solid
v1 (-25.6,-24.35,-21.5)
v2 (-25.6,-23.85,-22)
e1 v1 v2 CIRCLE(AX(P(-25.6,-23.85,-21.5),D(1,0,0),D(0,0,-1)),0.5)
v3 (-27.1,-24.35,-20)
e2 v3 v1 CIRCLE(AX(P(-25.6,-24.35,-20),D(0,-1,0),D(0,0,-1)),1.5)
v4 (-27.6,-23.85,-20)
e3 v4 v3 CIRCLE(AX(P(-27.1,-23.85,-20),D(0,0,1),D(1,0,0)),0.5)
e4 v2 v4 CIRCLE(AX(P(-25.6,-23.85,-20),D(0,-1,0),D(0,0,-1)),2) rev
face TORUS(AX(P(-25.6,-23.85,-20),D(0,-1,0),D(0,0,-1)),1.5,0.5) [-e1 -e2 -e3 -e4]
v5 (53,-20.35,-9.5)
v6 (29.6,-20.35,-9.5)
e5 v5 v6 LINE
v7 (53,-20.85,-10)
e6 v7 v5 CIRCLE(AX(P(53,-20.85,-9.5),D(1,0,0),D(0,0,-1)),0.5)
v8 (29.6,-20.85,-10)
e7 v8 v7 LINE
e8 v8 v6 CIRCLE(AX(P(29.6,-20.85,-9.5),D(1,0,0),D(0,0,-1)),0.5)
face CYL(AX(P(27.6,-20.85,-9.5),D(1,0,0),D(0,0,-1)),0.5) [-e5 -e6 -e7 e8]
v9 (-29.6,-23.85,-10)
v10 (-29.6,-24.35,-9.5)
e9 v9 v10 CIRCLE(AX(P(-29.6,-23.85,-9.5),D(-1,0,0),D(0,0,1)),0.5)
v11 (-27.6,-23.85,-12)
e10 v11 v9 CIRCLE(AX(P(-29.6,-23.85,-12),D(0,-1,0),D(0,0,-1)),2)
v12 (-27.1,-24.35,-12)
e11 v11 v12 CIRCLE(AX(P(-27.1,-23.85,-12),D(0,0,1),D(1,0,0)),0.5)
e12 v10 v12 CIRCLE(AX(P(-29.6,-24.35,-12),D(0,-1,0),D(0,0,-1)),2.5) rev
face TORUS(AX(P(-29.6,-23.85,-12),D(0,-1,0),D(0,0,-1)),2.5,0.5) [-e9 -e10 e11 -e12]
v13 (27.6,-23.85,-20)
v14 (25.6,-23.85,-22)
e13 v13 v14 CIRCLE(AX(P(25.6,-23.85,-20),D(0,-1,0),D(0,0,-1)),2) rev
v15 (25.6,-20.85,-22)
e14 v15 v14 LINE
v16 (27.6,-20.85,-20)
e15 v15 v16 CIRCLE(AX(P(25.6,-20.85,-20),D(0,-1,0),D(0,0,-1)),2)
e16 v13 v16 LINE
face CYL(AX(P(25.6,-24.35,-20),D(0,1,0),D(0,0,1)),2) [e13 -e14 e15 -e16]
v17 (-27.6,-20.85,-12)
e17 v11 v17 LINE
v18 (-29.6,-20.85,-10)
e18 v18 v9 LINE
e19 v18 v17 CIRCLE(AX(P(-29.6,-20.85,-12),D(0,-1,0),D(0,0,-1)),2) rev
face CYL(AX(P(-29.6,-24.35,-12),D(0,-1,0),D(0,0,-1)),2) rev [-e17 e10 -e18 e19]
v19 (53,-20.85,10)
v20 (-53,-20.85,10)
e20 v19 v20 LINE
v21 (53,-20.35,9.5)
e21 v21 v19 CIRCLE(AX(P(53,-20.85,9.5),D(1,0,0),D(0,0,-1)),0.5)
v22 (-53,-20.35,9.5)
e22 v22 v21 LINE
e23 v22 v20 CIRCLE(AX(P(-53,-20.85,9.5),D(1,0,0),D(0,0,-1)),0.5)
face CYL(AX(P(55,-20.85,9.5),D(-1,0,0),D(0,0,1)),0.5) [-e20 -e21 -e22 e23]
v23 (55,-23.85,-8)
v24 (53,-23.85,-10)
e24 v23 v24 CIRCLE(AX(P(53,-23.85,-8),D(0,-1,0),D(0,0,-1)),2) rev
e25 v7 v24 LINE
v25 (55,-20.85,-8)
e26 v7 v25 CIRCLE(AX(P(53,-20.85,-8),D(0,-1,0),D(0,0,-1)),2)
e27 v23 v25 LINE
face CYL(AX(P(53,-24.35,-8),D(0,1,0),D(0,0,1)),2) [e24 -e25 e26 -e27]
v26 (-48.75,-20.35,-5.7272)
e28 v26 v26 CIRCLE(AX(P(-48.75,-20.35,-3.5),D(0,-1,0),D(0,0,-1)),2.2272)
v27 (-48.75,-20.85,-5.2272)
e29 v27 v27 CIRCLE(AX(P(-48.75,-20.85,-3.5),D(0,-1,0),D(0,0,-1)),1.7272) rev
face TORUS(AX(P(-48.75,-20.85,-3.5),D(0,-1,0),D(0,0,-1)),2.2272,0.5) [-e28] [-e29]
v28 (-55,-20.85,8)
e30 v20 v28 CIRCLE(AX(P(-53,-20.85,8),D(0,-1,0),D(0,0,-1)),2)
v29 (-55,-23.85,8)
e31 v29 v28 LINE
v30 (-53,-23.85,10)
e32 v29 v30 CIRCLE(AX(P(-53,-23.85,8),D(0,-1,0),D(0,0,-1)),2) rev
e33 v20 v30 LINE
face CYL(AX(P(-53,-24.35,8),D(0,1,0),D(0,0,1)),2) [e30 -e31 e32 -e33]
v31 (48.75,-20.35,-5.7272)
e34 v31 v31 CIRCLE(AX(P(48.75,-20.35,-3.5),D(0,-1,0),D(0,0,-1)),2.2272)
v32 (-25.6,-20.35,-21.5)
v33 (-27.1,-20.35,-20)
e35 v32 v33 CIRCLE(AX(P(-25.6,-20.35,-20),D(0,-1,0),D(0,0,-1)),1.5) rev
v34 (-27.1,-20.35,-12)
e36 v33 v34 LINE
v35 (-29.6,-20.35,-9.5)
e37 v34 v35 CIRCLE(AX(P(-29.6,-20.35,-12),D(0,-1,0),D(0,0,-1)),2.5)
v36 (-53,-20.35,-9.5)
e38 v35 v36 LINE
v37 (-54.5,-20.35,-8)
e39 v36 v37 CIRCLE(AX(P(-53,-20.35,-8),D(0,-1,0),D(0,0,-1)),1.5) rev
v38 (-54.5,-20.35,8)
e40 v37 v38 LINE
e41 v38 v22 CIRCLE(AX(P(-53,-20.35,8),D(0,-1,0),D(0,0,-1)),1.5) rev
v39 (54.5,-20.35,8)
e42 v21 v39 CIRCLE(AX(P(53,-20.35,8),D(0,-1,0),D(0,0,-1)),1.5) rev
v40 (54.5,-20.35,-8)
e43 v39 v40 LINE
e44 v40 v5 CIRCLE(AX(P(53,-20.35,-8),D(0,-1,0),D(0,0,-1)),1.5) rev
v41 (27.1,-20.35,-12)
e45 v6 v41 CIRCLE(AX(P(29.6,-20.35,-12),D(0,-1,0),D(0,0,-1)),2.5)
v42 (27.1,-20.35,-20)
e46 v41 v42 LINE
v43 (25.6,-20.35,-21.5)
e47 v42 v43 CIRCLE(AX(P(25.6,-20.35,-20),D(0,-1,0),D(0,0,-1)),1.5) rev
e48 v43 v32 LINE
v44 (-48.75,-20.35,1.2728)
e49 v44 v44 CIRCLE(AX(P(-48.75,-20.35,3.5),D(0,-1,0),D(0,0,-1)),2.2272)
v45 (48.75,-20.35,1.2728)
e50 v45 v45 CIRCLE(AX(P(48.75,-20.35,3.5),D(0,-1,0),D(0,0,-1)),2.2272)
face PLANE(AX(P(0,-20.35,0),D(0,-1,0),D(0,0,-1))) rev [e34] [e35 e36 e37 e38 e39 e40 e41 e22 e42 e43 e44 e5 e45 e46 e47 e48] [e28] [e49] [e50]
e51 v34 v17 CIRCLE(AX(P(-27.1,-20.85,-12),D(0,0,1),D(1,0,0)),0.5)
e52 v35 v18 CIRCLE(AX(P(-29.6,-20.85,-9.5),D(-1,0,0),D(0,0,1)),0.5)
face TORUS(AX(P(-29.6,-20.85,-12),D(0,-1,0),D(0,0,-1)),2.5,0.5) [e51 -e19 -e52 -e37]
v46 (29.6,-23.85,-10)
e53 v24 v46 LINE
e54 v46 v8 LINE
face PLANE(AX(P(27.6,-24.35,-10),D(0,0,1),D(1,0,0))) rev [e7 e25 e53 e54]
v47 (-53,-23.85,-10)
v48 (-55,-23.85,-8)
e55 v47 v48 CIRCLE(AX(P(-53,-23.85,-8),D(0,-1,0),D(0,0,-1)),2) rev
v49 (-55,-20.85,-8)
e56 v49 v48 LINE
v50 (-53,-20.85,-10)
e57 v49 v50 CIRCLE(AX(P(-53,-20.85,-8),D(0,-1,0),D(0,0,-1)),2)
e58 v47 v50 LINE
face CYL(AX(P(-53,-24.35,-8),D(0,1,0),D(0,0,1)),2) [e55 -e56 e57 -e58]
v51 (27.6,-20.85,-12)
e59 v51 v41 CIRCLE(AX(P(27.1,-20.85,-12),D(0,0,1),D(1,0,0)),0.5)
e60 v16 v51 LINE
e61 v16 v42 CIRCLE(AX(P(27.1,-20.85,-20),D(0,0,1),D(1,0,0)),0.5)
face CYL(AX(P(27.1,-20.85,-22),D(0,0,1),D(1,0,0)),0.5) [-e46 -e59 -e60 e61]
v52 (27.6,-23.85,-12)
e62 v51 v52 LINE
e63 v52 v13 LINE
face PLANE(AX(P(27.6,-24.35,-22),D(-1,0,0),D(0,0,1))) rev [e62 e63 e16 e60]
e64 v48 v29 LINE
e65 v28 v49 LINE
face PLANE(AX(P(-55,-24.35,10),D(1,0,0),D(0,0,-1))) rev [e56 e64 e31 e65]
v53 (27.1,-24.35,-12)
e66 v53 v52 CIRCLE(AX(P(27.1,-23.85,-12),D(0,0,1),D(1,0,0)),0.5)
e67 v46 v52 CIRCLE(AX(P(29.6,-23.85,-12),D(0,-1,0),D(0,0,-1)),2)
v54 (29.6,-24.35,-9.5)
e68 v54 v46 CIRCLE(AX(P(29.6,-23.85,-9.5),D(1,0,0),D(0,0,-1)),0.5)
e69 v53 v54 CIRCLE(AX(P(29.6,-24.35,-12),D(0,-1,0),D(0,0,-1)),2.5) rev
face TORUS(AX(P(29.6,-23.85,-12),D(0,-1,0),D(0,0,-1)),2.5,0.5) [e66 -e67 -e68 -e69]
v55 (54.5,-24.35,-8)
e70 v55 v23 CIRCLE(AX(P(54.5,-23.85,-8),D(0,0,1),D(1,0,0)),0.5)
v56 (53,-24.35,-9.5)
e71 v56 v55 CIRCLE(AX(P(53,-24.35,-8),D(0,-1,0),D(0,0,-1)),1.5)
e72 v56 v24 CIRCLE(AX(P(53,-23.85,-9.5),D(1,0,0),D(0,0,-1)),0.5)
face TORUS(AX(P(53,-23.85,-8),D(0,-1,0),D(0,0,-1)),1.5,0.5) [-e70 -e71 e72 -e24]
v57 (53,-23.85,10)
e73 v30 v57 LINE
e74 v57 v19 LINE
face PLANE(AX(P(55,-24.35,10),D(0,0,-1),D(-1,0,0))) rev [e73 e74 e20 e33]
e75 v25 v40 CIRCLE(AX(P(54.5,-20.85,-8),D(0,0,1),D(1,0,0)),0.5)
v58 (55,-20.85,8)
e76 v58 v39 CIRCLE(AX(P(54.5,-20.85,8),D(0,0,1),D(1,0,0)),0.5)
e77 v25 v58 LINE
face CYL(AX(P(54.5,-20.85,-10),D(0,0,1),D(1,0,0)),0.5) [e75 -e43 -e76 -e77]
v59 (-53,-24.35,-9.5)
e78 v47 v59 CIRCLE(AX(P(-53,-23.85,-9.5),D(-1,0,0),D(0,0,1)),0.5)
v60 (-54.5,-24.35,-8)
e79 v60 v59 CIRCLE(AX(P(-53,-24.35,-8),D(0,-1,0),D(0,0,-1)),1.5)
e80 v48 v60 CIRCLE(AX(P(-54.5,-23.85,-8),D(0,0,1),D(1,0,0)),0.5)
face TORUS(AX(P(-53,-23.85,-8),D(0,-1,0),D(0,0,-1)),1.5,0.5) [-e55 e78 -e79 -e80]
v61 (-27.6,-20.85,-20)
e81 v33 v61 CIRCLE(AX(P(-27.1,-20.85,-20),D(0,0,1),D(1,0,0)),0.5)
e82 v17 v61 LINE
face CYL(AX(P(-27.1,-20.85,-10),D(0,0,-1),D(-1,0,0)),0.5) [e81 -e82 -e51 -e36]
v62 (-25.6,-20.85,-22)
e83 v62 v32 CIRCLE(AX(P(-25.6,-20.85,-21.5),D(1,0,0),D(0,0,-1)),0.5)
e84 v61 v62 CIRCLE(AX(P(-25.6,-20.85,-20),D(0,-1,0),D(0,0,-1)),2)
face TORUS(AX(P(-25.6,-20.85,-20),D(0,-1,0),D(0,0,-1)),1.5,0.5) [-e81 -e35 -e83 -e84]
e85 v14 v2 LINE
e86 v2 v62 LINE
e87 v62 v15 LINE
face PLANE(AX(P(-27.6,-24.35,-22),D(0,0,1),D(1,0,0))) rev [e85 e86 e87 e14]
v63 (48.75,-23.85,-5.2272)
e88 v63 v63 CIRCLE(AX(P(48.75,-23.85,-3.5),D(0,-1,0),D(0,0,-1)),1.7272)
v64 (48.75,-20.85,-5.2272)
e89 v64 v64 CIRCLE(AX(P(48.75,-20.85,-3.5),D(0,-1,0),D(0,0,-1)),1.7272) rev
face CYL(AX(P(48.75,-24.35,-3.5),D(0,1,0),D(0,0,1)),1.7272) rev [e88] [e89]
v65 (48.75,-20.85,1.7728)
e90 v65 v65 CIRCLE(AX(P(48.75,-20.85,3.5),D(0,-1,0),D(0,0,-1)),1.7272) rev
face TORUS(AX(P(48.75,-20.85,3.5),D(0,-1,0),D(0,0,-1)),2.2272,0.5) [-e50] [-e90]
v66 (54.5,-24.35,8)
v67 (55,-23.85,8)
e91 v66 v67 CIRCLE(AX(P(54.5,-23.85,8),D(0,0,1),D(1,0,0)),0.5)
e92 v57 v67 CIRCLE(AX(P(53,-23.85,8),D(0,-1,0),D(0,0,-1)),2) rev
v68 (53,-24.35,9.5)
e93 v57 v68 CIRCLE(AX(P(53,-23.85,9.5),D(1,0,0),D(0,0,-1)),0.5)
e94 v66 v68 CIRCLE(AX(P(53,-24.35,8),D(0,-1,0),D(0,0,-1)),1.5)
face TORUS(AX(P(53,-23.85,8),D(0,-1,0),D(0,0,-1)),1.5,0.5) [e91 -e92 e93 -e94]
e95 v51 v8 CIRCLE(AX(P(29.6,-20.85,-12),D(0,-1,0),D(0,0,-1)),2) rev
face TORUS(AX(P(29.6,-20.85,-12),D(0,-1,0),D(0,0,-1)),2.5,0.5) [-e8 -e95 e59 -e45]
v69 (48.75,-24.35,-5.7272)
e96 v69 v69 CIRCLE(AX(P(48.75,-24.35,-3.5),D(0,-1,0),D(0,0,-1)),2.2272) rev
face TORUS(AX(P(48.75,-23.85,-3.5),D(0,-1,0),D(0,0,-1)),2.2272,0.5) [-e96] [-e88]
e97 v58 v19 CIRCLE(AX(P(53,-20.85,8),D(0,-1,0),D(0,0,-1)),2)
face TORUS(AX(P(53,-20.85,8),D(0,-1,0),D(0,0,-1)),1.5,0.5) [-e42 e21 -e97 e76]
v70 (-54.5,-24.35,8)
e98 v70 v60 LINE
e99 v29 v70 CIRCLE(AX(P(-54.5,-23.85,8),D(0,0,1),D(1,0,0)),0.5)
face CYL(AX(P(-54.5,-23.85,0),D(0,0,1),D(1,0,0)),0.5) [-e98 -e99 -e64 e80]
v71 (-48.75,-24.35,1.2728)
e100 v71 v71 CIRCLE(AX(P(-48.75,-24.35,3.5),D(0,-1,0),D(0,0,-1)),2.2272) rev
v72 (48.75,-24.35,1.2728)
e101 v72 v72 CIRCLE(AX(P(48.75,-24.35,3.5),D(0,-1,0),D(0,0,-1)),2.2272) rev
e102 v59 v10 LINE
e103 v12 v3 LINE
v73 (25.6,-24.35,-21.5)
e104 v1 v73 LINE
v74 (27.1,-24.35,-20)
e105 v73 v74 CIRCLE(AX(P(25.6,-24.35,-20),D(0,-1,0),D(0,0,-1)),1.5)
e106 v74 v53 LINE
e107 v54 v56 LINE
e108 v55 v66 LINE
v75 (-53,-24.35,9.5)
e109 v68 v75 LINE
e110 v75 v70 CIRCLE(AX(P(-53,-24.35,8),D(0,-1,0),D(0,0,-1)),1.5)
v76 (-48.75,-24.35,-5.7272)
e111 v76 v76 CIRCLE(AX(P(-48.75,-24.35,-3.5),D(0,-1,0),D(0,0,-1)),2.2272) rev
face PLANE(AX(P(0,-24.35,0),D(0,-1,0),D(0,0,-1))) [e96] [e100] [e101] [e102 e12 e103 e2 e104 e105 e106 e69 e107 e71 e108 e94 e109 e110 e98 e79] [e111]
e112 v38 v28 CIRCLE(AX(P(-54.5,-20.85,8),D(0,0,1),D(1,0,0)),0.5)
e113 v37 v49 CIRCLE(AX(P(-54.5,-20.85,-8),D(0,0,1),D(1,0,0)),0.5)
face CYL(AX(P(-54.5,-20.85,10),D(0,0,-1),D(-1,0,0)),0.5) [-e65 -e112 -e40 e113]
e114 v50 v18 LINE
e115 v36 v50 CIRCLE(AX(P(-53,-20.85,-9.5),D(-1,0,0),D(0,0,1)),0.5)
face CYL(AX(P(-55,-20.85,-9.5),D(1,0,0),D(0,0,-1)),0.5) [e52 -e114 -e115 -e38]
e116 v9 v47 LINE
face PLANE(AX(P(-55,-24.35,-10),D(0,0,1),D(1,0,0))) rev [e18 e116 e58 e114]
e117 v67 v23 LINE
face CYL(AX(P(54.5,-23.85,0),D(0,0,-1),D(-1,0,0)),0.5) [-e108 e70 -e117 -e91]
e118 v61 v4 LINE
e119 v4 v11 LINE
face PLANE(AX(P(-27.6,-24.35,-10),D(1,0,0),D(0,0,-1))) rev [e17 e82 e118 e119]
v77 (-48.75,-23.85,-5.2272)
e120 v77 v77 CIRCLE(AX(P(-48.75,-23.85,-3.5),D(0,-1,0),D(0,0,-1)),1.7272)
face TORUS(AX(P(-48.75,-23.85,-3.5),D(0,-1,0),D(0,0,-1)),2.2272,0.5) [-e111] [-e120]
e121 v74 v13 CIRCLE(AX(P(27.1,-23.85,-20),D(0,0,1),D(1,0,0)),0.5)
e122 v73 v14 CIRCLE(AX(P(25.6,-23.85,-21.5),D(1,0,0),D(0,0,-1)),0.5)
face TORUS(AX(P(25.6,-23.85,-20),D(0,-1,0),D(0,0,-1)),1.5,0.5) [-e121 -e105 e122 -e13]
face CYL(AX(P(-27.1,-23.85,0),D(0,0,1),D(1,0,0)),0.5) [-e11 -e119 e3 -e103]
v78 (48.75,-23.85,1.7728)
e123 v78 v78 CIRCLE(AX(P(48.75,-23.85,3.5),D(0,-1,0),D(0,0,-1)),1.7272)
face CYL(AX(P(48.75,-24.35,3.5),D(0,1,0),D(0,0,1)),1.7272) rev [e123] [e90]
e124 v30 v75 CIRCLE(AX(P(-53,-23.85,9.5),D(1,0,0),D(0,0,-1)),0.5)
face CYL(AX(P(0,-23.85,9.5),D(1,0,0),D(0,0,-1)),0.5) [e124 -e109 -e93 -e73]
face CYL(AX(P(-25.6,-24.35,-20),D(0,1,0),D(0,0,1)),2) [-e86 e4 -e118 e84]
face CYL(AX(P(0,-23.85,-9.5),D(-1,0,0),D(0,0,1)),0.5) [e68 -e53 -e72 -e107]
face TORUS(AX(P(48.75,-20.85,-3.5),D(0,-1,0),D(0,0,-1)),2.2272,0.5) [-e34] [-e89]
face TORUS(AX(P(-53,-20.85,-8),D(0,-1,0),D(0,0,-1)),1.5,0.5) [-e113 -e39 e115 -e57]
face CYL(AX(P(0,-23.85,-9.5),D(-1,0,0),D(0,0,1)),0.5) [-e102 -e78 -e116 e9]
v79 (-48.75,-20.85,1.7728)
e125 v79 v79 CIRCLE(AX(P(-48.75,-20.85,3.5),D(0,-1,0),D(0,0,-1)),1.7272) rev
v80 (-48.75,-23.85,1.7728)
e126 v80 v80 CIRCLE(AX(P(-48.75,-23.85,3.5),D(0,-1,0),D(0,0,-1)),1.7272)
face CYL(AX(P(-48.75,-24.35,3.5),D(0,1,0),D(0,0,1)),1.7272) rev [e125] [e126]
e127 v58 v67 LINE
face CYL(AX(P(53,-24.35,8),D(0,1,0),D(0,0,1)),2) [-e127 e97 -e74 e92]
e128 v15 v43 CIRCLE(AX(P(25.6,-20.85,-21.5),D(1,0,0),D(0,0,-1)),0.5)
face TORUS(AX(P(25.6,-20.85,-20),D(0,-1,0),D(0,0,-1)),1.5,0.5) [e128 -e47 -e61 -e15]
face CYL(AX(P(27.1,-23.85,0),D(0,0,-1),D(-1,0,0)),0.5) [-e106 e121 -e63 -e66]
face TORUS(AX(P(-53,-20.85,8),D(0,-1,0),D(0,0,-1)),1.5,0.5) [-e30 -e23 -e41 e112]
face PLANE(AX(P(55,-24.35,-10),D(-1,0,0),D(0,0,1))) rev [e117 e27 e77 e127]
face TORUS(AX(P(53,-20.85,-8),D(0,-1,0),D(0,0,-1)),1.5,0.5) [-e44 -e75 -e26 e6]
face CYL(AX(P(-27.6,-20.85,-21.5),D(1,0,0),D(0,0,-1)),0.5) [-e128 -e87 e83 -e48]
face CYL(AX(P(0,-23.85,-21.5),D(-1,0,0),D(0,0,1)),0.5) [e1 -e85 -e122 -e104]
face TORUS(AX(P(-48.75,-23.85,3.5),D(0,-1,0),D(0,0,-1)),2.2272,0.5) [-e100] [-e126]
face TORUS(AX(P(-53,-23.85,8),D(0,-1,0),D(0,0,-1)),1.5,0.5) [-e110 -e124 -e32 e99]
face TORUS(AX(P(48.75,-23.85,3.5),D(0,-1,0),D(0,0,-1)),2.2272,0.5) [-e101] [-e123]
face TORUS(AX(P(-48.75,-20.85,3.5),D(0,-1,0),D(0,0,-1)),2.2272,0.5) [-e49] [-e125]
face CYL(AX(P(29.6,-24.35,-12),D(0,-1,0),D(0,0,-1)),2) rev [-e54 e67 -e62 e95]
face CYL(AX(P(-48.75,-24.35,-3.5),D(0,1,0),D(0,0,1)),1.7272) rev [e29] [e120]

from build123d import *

# Parameters (mm, degrees)
SKETCH1_R                           = 1.325
BOSS_EXTRUDE1_DEPTH                 = 10
SKETCH2_W                           = 20
SKETCH2_H                           = 5.5
BOSS_EXTRUDE2_DEPTH                 = 55
TAP_DRILL_FOR_8_32_TAP1_D           = 3.4544
TAP_DRILL_FOR_8_32_TAP1_CSINK_D     = 4.7244
TAP_DRILL_FOR_8_32_TAP1_CSINK_ANGLE = 90
MIRROR2_COPY_1_D                    = 3.4544
MIRROR2_COPY_1_CSINK_D              = 4.7244
MIRROR2_COPY_1_CSINK_ANGLE          = 90
SKETCH6_W                           = 20
SKETCH6_H                           = 4.85
BOSS_EXTRUDE3_DEPTH                 = 6.5
SKETCH7_W                           = 55.2
SKETCH7_H                           = 5.5
BOSS_EXTRUDE4_DEPTH                 = 12
SKETCH9_R                           = 1.7272
BOSS_EXTRUDE5_DEPTH                 = 4
FILLET4_R                           = 3
FILLET1_R                           = 2
FILLET5_R                           = 1.25
FILLET2_R                           = 1
FILLET6_R                           = 1
SPLIT1_SURFACE_1_BACK               = 123.936
SPLIT1_SURFACE_1_DEPTH              = 247.872
SPLIT1_SURFACE_2_BACK               = 123.936
SPLIT1_SURFACE_2_DEPTH              = 247.872
FILLET7_R                           = 2
FILLET8_R                           = 0.5


with BuildPart() as part:
    # Sketch1 → Boss-Extrude1 (new, symmetric)
    with BuildSketch(Plane.XY):
        Polygon((-42.5, -20.25), (42.5, -20.25), (42.5, 20.25), (32.6, 20.25), (32.6, -14.75), (-32.6, -14.75), (-32.6, 20.25), (-42.5, 20.25), align=None)
        with Locations((-37.5, 8.649817683)):
            Circle(SKETCH1_R, mode=Mode.SUBTRACT)
        with Locations((-37.5, -8.350182317)):
            Circle(SKETCH1_R, mode=Mode.SUBTRACT)
        with Locations(Location((37.5, -8.350182317, 0), (0, 0, 180))):
            Circle(SKETCH1_R, mode=Mode.SUBTRACT)
        with Locations(Location((37.5, 8.649817683, 0), (0, 0, 180))):
            Circle(SKETCH1_R, mode=Mode.SUBTRACT)
    extrude(amount=BOSS_EXTRUDE1_DEPTH, both=True)

    # Sketch2 → Boss-Extrude2 (add, symmetric)
    with BuildSketch(Plane(origin=(0, 0, 0), x_dir=(0, 0, -1), z_dir=(1, 0, 0))):
        with Locations((0, -17.5)):
            Rectangle(SKETCH2_W, SKETCH2_H)
    extrude(amount=BOSS_EXTRUDE2_DEPTH, both=True)

    # Tap Drill for #8-32 Tap1 (through all)
    with Locations(Plane(origin=(-48.75, -14.75, -3.5), x_dir=(0, 0, 1), z_dir=(0, 1, 0))):
        with Locations((0, 0)):
            tap_drill_for_8_32_tap1 = CounterSinkHole(TAP_DRILL_FOR_8_32_TAP1_D / 2, TAP_DRILL_FOR_8_32_TAP1_CSINK_D / 2, counter_sink_angle=TAP_DRILL_FOR_8_32_TAP1_CSINK_ANGLE)

    # Mirror1: Tap Drill for #8-32 Tap1 across plane
    add(tap_drill_for_8_32_tap1.mirror(Plane.XY), mode=Mode.SUBTRACT)

    # Mirror2: Tap Drill for #8-32 Tap1 across plane
    add(tap_drill_for_8_32_tap1.mirror(Plane(origin=(0, 0, 0), x_dir=(0, 0, 1), z_dir=(1, 0, 0))), mode=Mode.SUBTRACT)

    # Mirror2 copy 1 (through all)
    with Locations(Plane(origin=(48.75, -14.75, 3.5), x_dir=(0, 0, -1), z_dir=(0, 1, 0))):
        with Locations((0, 0)):
            CounterSinkHole(MIRROR2_COPY_1_D / 2, MIRROR2_COPY_1_CSINK_D / 2, counter_sink_angle=MIRROR2_COPY_1_CSINK_ANGLE)

    # Sketch6 → Boss-Extrude3 (add)
    with BuildSketch(Plane(origin=(-32.6, 0, 0), x_dir=(0, 0, -1), z_dir=(1, 0, 0))):
        with Locations((0, 17.825)):
            Rectangle(SKETCH6_W, SKETCH6_H)
    boss_extrude3 = extrude(amount=BOSS_EXTRUDE3_DEPTH)

    # Mirror3: Boss-Extrude3 across plane
    add(boss_extrude3.mirror(Plane(origin=(0, 0, 0), x_dir=(0, 0, 1), z_dir=(1, 0, 0))))

    # Sketch7 → Boss-Extrude4 (add)
    with BuildSketch(Plane(origin=(0, 0, -10), x_dir=(-1, 0, 0), z_dir=(0, 0, -1))):
        with Locations((0, -17.5)):
            Rectangle(SKETCH7_W, SKETCH7_H)
    extrude(amount=BOSS_EXTRUDE4_DEPTH)

    # Fillet4
    fillet4_edges = [part.edges().sort_by_distance(p)[0] for p in [
        (27.6, -17.5, -10),
        (-27.6, -17.5, -10),
    ]]
    fillet(fillet4_edges, radius=FILLET4_R)

    # Fillet1
    fillet1_edges = [part.edges().sort_by_distance(p)[0] for p in [
        (32.6, 15.4, 0),
        (42.5, 20.25, 0),
        (-42.5, 20.25, 0),
        (-32.6, -14.75, 0),
        (32.6, -14.75, 0),
        (-42.5, -14.75, 0),
        (-55, -14.75, 0),
        (42.5, -14.75, 0),
        (55, -14.75, 0),
        (-32.6, 15.4, 0),
    ]]
    fillet(fillet1_edges, radius=FILLET1_R)

    # Fillet5
    fillet5_edges = [part.edges().sort_by_distance(p)[0] for p in [
        (26.1, 20.25, 0),
        (26.1, 15.4, 0),
        (-26.1, 15.4, 0),
        (-26.1, 20.25, 0),
    ]]
    fillet(fillet5_edges, radius=FILLET5_R)

    # Fillet2
    fillet2_edges = [part.edges().sort_by_distance(p)[0] for p in [
        (-27.6, -20.25, -17.5),
        (0, -14.75, -22),
        (-28.478679656, -20.25, -10.878679656),
        (-42.8, -20.25, -10),
        (-55, -20.25, 0),
        (55, -20.25, 0),
    ]]
    fillet(fillet2_edges, radius=FILLET2_R)

    # Fillet6
    # the kernel refuses this fillet: 1 mm, written as the material it takes off along each edge
    with BuildSketch(Plane(origin=(-54, -19.25, -9), x_dir=(-1, 0, 0), z_dir=(0, 0, -1))) as fillet6_piece_1_section:
        Polygon((0, 0), (FILLET6_R, 0), (FILLET6_R, -FILLET6_R), (0, -FILLET6_R), align=None)
    fillet6_piece_1 = extrude(amount=FILLET6_R, mode=Mode.PRIVATE)
    fillet6_piece_1 = fillet6_piece_1 - Plane(origin=(-54, -19.25, -9), x_dir=(0.7071067811865475, 0.7071067811865475, 0), z_dir=(0, 0, -1)) * Sphere(FILLET6_R, mode=Mode.PRIVATE)
    add(fillet6_piece_1, mode=Mode.SUBTRACT)
    with BuildSketch(Plane(origin=(26.6, -19.25, -21), x_dir=(0, -1, 0), z_dir=(0, 0, -1))) as fillet6_piece_2_section:
        Polygon((0, 0), (FILLET6_R, 0), (FILLET6_R, -FILLET6_R), (0, -FILLET6_R), align=None)
    fillet6_piece_2 = extrude(amount=FILLET6_R, mode=Mode.PRIVATE)
    fillet6_piece_2 = fillet6_piece_2 - Plane(origin=(26.6, -19.25, -21), x_dir=(-0.7071067811865475, 0.7071067811865475, 0), z_dir=(0, 0, -1)) * Sphere(FILLET6_R, mode=Mode.PRIVATE)
    add(fillet6_piece_2, mode=Mode.SUBTRACT)
    with BuildSketch(Plane(origin=(27.6, -20.25, -13), x_dir=(-1, 0, 0), z_dir=(0, 0, -1)), Plane(origin=(-27.6, -14.75, -13), x_dir=(1, 0, 0), z_dir=(0, 0, -1))) as fillet6_piece_3:
        with BuildLine():
            CenterArc((FILLET6_R, FILLET6_R), FILLET6_R, 180, 90)
            Line((0, FILLET6_R), (0, 0))
            Line((0, 0), (FILLET6_R, 0))
        make_face()
    extrude(amount=8, mode=Mode.SUBTRACT)
    with BuildSketch(Plane(origin=(-26.6, -20.25, -22), x_dir=(0, 0, 1), z_dir=(1, 0, 0))) as fillet6_piece_4:
        with BuildLine():
            CenterArc((FILLET6_R, -FILLET6_R), FILLET6_R, 90, 90)
            Line((0, -FILLET6_R), (0, 0))
            Line((0, 0), (FILLET6_R, 0))
        make_face()
    extrude(amount=53.2, mode=Mode.SUBTRACT)
    with BuildSketch(Plane(origin=(30.6, -20.25, -10), x_dir=(0, 0, 1), z_dir=(1, 0, 0))) as fillet6_piece_5:
        with BuildLine():
            CenterArc((FILLET6_R, -FILLET6_R), FILLET6_R, 90, 90)
            Line((0, -FILLET6_R), (0, 0))
            Line((0, 0), (FILLET6_R, 0))
        make_face()
    extrude(amount=23.4, mode=Mode.SUBTRACT)
    with BuildSketch(Plane(origin=(30.6, -20.25, -13), x_dir=(0, 0, 1), z_dir=(1, 0, 0))) as fillet6_piece_6:
        with BuildLine():
            CenterArc((3 + FILLET6_R, -FILLET6_R), FILLET6_R, 90, 90)
            Line((3, -FILLET6_R), (3, 0))
            Line((3, 0), (3 + FILLET6_R, 0))
        make_face()
    revolve(axis=Axis((30.6, -20.25, -13), (0, -1, 0)), revolution_arc=90, mode=Mode.SUBTRACT)
    with BuildSketch(Plane(origin=(30.6, -14.75, -13), x_dir=(0, 0, 1), z_dir=(1, 0, 0))) as fillet6_piece_7:
        with BuildLine():
            CenterArc((3 + FILLET6_R, FILLET6_R), FILLET6_R, 180, 90)
            Line((3, FILLET6_R), (3, 0))
            Line((3, 0), (3 + FILLET6_R, 0))
        make_face()
    revolve(axis=Axis((30.6, -14.75, -13), (0, -1, 0)), revolution_arc=90, mode=Mode.SUBTRACT)
    with BuildSketch(Plane(origin=(-30.6, -14.75, -13), x_dir=(0, 0, 1), z_dir=(-1, 0, 0))) as fillet6_piece_8:
        with BuildLine():
            CenterArc((3 + FILLET6_R, -FILLET6_R), FILLET6_R, 90, 90)
            Line((3 + FILLET6_R, 0), (3, 0))
            Line((3, 0), (3, -FILLET6_R))
        make_face()
    revolve(axis=Axis((-30.6, -14.75, -13), (0, 1, 0)), revolution_arc=90, mode=Mode.SUBTRACT)
    with BuildSketch(Plane(origin=(-32.6, -12.75, -10), x_dir=(-1, 0, 0), z_dir=(0, 1, 0))) as fillet6_piece_9:
        with BuildLine():
            CenterArc((FILLET6_R, FILLET6_R), FILLET6_R, 180, 90)
            Line((0, FILLET6_R), (0, 0))
            Line((0, 0), (FILLET6_R, 0))
        make_face()
    extrude(amount=26.15, mode=Mode.SUBTRACT)
    with BuildSketch(Plane(origin=(32.6, 13.4, -10), x_dir=(0, 0, 1), z_dir=(0, -1, 0))) as fillet6_piece_10:
        with BuildLine():
            CenterArc((FILLET6_R, -FILLET6_R), FILLET6_R, 90, 90)
            Line((0, -FILLET6_R), (0, 0))
            Line((0, 0), (FILLET6_R, 0))
        make_face()
    extrude(amount=26.15, mode=Mode.SUBTRACT)
    with BuildSketch(Plane(origin=(44.5, -14.75, -10), x_dir=(0, 0, 1), z_dir=(1, 0, 0))) as fillet6_piece_11:
        with BuildLine():
            CenterArc((FILLET6_R, FILLET6_R), FILLET6_R, 180, 90)
            Line((0, FILLET6_R), (0, 0))
            Line((0, 0), (FILLET6_R, 0))
        make_face()
    extrude(amount=8.5, mode=Mode.SUBTRACT)
    with BuildSketch(Plane(origin=(27.35, 20.25, -10), x_dir=(0, 0, 1), z_dir=(1, 0, 0))) as fillet6_piece_12:
        with BuildLine():
            CenterArc((FILLET6_R, FILLET6_R), FILLET6_R, 180, 90)
            Line((0, FILLET6_R), (0, 0))
            Line((0, 0), (FILLET6_R, 0))
        make_face()
    extrude(amount=13.15, mode=Mode.SUBTRACT)
    with BuildSketch(Plane(origin=(42.5, -12.75, -10), x_dir=(0, 0, 1), z_dir=(0, 1, 0))) as fillet6_piece_13:
        with BuildLine():
            CenterArc((FILLET6_R, -FILLET6_R), FILLET6_R, 90, 90)
            Line((0, -FILLET6_R), (0, 0))
            Line((0, 0), (FILLET6_R, 0))
        make_face()
    extrude(amount=31, mode=Mode.SUBTRACT)
    with BuildSketch(Plane(origin=(40.5, 18.25, -10), x_dir=(1, 0, 0), z_dir=(0, -1, 0))) as fillet6_piece_14:
        with BuildLine():
            CenterArc((2 - FILLET6_R, FILLET6_R), FILLET6_R, 270, 90)
            Line((2 - FILLET6_R, 0), (2, 0))
            Line((2, 0), (2, FILLET6_R))
        make_face()
    revolve(axis=Axis((40.5, 18.25, -10), (0, 0, 1)), revolution_arc=90, mode=Mode.SUBTRACT)
    with BuildSketch(Plane(origin=(53, -16.75, -10), x_dir=(1, 0, 0), z_dir=(0, -1, 0))) as fillet6_piece_15:
        with BuildLine():
            CenterArc((2 - FILLET6_R, FILLET6_R), FILLET6_R, 270, 90)
            Line((2 - FILLET6_R, 0), (2, 0))
            Line((2, 0), (2, FILLET6_R))
        make_face()
    revolve(axis=Axis((53, -16.75, -10), (0, 0, 1)), revolution_arc=90, mode=Mode.SUBTRACT)
    with BuildSketch(Plane(origin=(-53, -14.75, -10), x_dir=(0, -1, 0), z_dir=(1, 0, 0))) as fillet6_piece_16:
        with BuildLine():
            CenterArc((FILLET6_R, -FILLET6_R), FILLET6_R, 90, 90)
            Line((0, -FILLET6_R), (0, 0))
            Line((0, 0), (FILLET6_R, 0))
        make_face()
    extrude(amount=8.5, mode=Mode.SUBTRACT)
    with BuildSketch(Plane(origin=(-42.5, 18.25, -10), x_dir=(1, 0, 0), z_dir=(0, -1, 0))) as fillet6_piece_17:
        with BuildLine():
            CenterArc((FILLET6_R, FILLET6_R), FILLET6_R, 180, 90)
            Line((0, FILLET6_R), (0, 0))
            Line((0, 0), (FILLET6_R, 0))
        make_face()
    extrude(amount=31, mode=Mode.SUBTRACT)
    with BuildSketch(Plane(origin=(-40.5, 18.25, -10), x_dir=(-1, 0, 0), z_dir=(0, -1, 0))) as fillet6_piece_18:
        with BuildLine():
            CenterArc((2 - FILLET6_R, -FILLET6_R), FILLET6_R, 0, 90)
            Line((2, -FILLET6_R), (2, 0))
            Line((2, 0), (2 - FILLET6_R, 0))
        make_face()
    revolve(axis=Axis((-40.5, 18.25, -10), (0, 0, -1)), revolution_arc=90, mode=Mode.SUBTRACT)
    with BuildSketch(Plane(origin=(-53, -16.75, -10), x_dir=(-1, 0, 0), z_dir=(0, -1, 0))) as fillet6_piece_19:
        with BuildLine():
            CenterArc((2 - FILLET6_R, -FILLET6_R), FILLET6_R, 0, 90)
            Line((2, -FILLET6_R), (2, 0))
            Line((2, 0), (2 - FILLET6_R, 0))
        make_face()
    revolve(axis=Axis((-53, -16.75, -10), (0, 0, -1)), revolution_arc=90, mode=Mode.SUBTRACT)
    with BuildSketch(Plane(origin=(-30.6, -12.75, -10), x_dir=(0, -1, 0), z_dir=(1, 0, 0))) as fillet6_piece_20:
        with BuildLine():
            CenterArc((2 + FILLET6_R, -FILLET6_R), FILLET6_R, 90, 90)
            Line((2, -FILLET6_R), (2, 0))
            Line((2, 0), (2 + FILLET6_R, 0))
        make_face()
    revolve(axis=Axis((-30.6, -12.75, -10), (0, 0, -1)), revolution_arc=90, mode=Mode.SUBTRACT)
    with BuildSketch(Plane(origin=(-30.6, 13.4, -10), x_dir=(-1, 0, 0), z_dir=(0, -1, 0))) as fillet6_piece_21:
        with BuildLine():
            CenterArc((2 + FILLET6_R, -FILLET6_R), FILLET6_R, 90, 90)
            Line((2, -FILLET6_R), (2, 0))
            Line((2, 0), (2 + FILLET6_R, 0))
        make_face()
    revolve(axis=Axis((-30.6, 13.4, -10), (0, 0, -1)), revolution_arc=90, mode=Mode.SUBTRACT)
    with BuildSketch(Plane(origin=(30.6, 13.4, -10), x_dir=(0, 1, 0), z_dir=(-1, 0, 0))) as fillet6_piece_22:
        with BuildLine():
            CenterArc((2 + FILLET6_R, -FILLET6_R), FILLET6_R, 90, 90)
            Line((2 + FILLET6_R, 0), (2, 0))
            Line((2, 0), (2, -FILLET6_R))
        make_face()
    revolve(axis=Axis((30.6, 13.4, -10), (0, 0, -1)), revolution_arc=90, mode=Mode.SUBTRACT)
    with BuildSketch(Plane(origin=(30.6, -12.75, -10), x_dir=(0, -1, 0), z_dir=(-1, 0, 0))) as fillet6_piece_23:
        with BuildLine():
            CenterArc((2 + FILLET6_R, FILLET6_R), FILLET6_R, 180, 90)
            Line((2 + FILLET6_R, 0), (2, 0))
            Line((2, 0), (2, FILLET6_R))
        make_face()
    revolve(axis=Axis((30.6, -12.75, -10), (0, 0, 1)), revolution_arc=90, mode=Mode.SUBTRACT)
    with BuildSketch(Plane(origin=(44.5, -12.75, -10), x_dir=(0, -1, 0), z_dir=(1, 0, 0))) as fillet6_piece_24:
        with BuildLine():
            CenterArc((2 + FILLET6_R, -FILLET6_R), FILLET6_R, 90, 90)
            Line((2 + FILLET6_R, 0), (2, 0))
            Line((2, 0), (2, -FILLET6_R))
        make_face()
    revolve(axis=Axis((44.5, -12.75, -10), (0, 0, -1)), revolution_arc=90, mode=Mode.SUBTRACT)
    with BuildSketch(Plane(origin=(-44.5, -12.75, -10), x_dir=(0, -1, 0), z_dir=(-1, 0, 0))) as fillet6_piece_25:
        with BuildLine():
            CenterArc((2 + FILLET6_R, FILLET6_R), FILLET6_R, 180, 90)
            Line((2, FILLET6_R), (2, 0))
            Line((2, 0), (2 + FILLET6_R, 0))
        make_face()
    revolve(axis=Axis((-44.5, -12.75, -10), (0, 0, 1)), revolution_arc=90, mode=Mode.SUBTRACT)
    with BuildSketch(Plane(origin=(-26.1, 19, -10), x_dir=(-1, 0, 0), z_dir=(0, -1, 0)), Plane(origin=(26.1, 19, -10), x_dir=(0, 0, 1), z_dir=(0, -1, 0))) as fillet6_piece_26:
        with BuildLine():
            CenterArc((FILLET6_R, -FILLET6_R), FILLET6_R, 90, 90)
            Line((0, -FILLET6_R), (0, 0))
            Line((0, 0), (FILLET6_R, 0))
        make_face()
    extrude(amount=2.35, mode=Mode.SUBTRACT)
    with BuildSketch(Plane(origin=(-40.5, 20.25, -10), x_dir=(0, -1, 0), z_dir=(1, 0, 0))) as fillet6_piece_27:
        with BuildLine():
            CenterArc((FILLET6_R, -FILLET6_R), FILLET6_R, 90, 90)
            Line((0, -FILLET6_R), (0, 0))
            Line((0, 0), (FILLET6_R, 0))
        make_face()
    extrude(amount=13.15, mode=Mode.SUBTRACT)
    with BuildSketch(Plane(origin=(-30.6, 15.4, -10), x_dir=(0, 1, 0), z_dir=(1, 0, 0)), Plane(origin=(30.6, 15.4, -10), x_dir=(0, 0, 1), z_dir=(-1, 0, 0))) as fillet6_piece_28:
        with BuildLine():
            CenterArc((FILLET6_R, FILLET6_R), FILLET6_R, 180, 90)
            Line((0, FILLET6_R), (0, 0))
            Line((0, 0), (FILLET6_R, 0))
        make_face()
    extrude(amount=3.25, mode=Mode.SUBTRACT)
    with BuildSketch(Plane(origin=(-27.35, 19, -10), x_dir=(0, 1, 0), z_dir=(-1, 0, 0))) as fillet6_piece_29:
        with BuildLine():
            CenterArc((1.25 - FILLET6_R, -FILLET6_R), FILLET6_R, 0, 90)
            Line((1.25, -FILLET6_R), (1.25, 0))
            Line((1.25, 0), (1.25 - FILLET6_R, 0))
        make_face()
    revolve(axis=Axis((-27.35, 19, -10), (0, 0, -1)), revolution_arc=90, mode=Mode.SUBTRACT)
    with BuildSketch(Plane(origin=(-27.35, 16.65, -10), x_dir=(0, -1, 0), z_dir=(-1, 0, 0))) as fillet6_piece_30:
        with BuildLine():
            CenterArc((1.25 - FILLET6_R, FILLET6_R), FILLET6_R, 270, 90)
            Line((1.25, FILLET6_R), (1.25, 0))
            Line((1.25, 0), (1.25 - FILLET6_R, 0))
        make_face()
    revolve(axis=Axis((-27.35, 16.65, -10), (0, 0, 1)), revolution_arc=90, mode=Mode.SUBTRACT)
    with BuildSketch(Plane(origin=(27.35, 19, -10), x_dir=(-1, 0, 0), z_dir=(0, -1, 0))) as fillet6_piece_31:
        with BuildLine():
            CenterArc((1.25 - FILLET6_R, -FILLET6_R), FILLET6_R, 0, 90)
            Line((1.25 - FILLET6_R, 0), (1.25, 0))
            Line((1.25, 0), (1.25, -FILLET6_R))
        make_face()
    revolve(axis=Axis((27.35, 19, -10), (0, 0, -1)), revolution_arc=90, mode=Mode.SUBTRACT)
    with BuildSketch(Plane(origin=(27.35, 16.65, -10), x_dir=(0, -1, 0), z_dir=(1, 0, 0))) as fillet6_piece_32:
        with BuildLine():
            CenterArc((1.25 - FILLET6_R, -FILLET6_R), FILLET6_R, 0, 90)
            Line((1.25 - FILLET6_R, 0), (1.25, 0))
            Line((1.25, 0), (1.25, -FILLET6_R))
        make_face()
    revolve(axis=Axis((27.35, 16.65, -10), (0, 0, -1)), revolution_arc=90, mode=Mode.SUBTRACT)
    with BuildSketch(Plane(origin=(-27.6, -15.75, -22), x_dir=(0, 0, 1), z_dir=(0, -1, 0)), Plane(origin=(27.6, -19.25, -22), x_dir=(0, 0, 1), z_dir=(0, 1, 0))) as fillet6_piece_33:
        with BuildLine():
            CenterArc((FILLET6_R, -FILLET6_R), FILLET6_R, 90, 90)
            Line((0, -FILLET6_R), (0, 0))
            Line((0, 0), (FILLET6_R, 0))
        make_face()
    extrude(amount=3.5, mode=Mode.SUBTRACT)
    with BuildSketch(Plane(origin=(-27.6, -15.75, -21), x_dir=(0, 1, 0), z_dir=(0, 0, 1))) as fillet6_piece_34:
        with BuildLine():
            CenterArc((1 - FILLET6_R, -FILLET6_R), FILLET6_R, 0, 90)
            Line((1, -FILLET6_R), (1, 0))
            Line((1, 0), (1 - FILLET6_R, 0))
        make_face()
    revolve(axis=Axis((-27.6, -15.75, -21), (-1, 0, 0)), revolution_arc=90, mode=Mode.SUBTRACT)
    with BuildSketch(Plane(origin=(-26.6, -19.25, -22), x_dir=(0, -1, 0), z_dir=(1, 0, 0))) as fillet6_piece_35:
        with BuildLine():
            CenterArc((1 - FILLET6_R, -FILLET6_R), FILLET6_R, 0, 90)
            Line((1 - FILLET6_R, 0), (1, 0))
            Line((1, 0), (1, -FILLET6_R))
        make_face()
    revolve(axis=Axis((-26.6, -19.25, -22), (0, 0, -1)), revolution_arc=90, mode=Mode.SUBTRACT)
    with BuildSketch(Plane(origin=(27.6, -14.75, -13), x_dir=(-1, 0, 0), z_dir=(0, 0, -1))) as fillet6_piece_36:
        with BuildLine():
            CenterArc((FILLET6_R, -FILLET6_R), FILLET6_R, 90, 90)
            Line((0, -FILLET6_R), (0, 0))
            Line((0, 0), (FILLET6_R, 0))
        make_face()
    extrude(amount=8, mode=Mode.SUBTRACT)
    with BuildSketch(Plane(origin=(27.6, -15.75, -21), x_dir=(0, 1, 0), z_dir=(0, 0, 1))) as fillet6_piece_37:
        with BuildLine():
            CenterArc((1 - FILLET6_R, FILLET6_R), FILLET6_R, 270, 90)
            Line((1, FILLET6_R), (1, 0))
            Line((1, 0), (1 - FILLET6_R, 0))
        make_face()
    revolve(axis=Axis((27.6, -15.75, -21), (-1, 0, 0)), revolution_arc=90, mode=Mode.SUBTRACT)
    with BuildSketch(Plane(origin=(-55, -16.75, -10), x_dir=(1, 0, 0), z_dir=(0, -1, 0)), Plane(origin=(55, -16.75, -10), x_dir=(0, 0, 1), z_dir=(0, -1, 0))) as fillet6_piece_38:
        with BuildLine():
            CenterArc((FILLET6_R, FILLET6_R), FILLET6_R, 180, 90)
            Line((0, FILLET6_R), (0, 0))
            Line((0, 0), (FILLET6_R, 0))
        make_face()
    extrude(amount=2.5, mode=Mode.SUBTRACT)
    with BuildSketch(Plane(origin=(54, -19.25, -10), x_dir=(0, -1, 0), z_dir=(-1, 0, 0))) as fillet6_piece_39:
        with BuildLine():
            CenterArc((1 - FILLET6_R, FILLET6_R), FILLET6_R, 270, 90)
            Line((1 - FILLET6_R, 0), (1, 0))
            Line((1, 0), (1, FILLET6_R))
        make_face()
    revolve(axis=Axis((54, -19.25, -10), (0, 0, 1)), revolution_arc=90, mode=Mode.SUBTRACT)


with BuildPart() as body_2:
    # Sketch9 → Boss-Extrude5 (new body)
    with BuildSketch(Plane(origin=(0, -20.35, 0), x_dir=(-1, 0, 0), z_dir=(0, -1, 0))):
        Polygon((-55, -10), (55, -10), (55, 10), (27.6, 10), (27.6, 22), (-27.6, 22), (-27.6, 10), (-55, 10), align=None)
        with Locations(Location((-48.75, -3.5, 0), (0, 0, 90))):
            Circle(SKETCH9_R, mode=Mode.SUBTRACT)
        with Locations(Location((-48.75, 3.5, 0), (0, 0, 90))):
            Circle(SKETCH9_R, mode=Mode.SUBTRACT)
        with Locations(Location((48.75, -3.5, 0), (0, 0, 90))):
            Circle(SKETCH9_R, mode=Mode.SUBTRACT)
        with Locations(Location((48.75, 3.5, 0), (0, 0, 90))):
            Circle(SKETCH9_R, mode=Mode.SUBTRACT)
    extrude(amount=BOSS_EXTRUDE5_DEPTH)

    # Fillet7
    fillet7_edges = [body_2.edges().sort_by_distance(p)[0] for p in [
        (55, -22.35, -10),
        (27.6, -22.35, -10),
        (27.6, -22.35, -22),
        (-27.6, -22.35, -22),
        (-27.6, -22.35, -10),
        (-55, -22.35, -10),
        (-55, -22.35, 10),
        (55, -22.35, 10),
    ]]
    fillet(fillet7_edges, radius=FILLET7_R)

    # Fillet8
    fillet8_edges = [body_2.edges().sort_by_distance(p)[0] for p in [
        (48.75, -20.35, 5.2272),
        (48.75, -24.35, 5.2272),
        (48.75, -20.35, -1.7728),
        (48.75, -24.35, -1.7728),
        (-48.75, -20.35, 5.2272),
        (-48.75, -24.35, 5.2272),
        (-48.75, -20.35, -1.7728),
        (-48.75, -24.35, -1.7728),
        (-55, -20.35, 0),
        (-55, -24.35, 0),
        (55, -20.35, 0),
        (41.3, -20.35, -10),
        (27.6, -20.35, -16),
        (0, -20.35, -22),
        (-27.6, -20.35, -16),
        (-41.3, -20.35, -10),
        (0, -20.35, 10),
        (54.414213562, -20.35, -9.414213562),
        (54.414213562, -20.35, 9.414213562),
        (27.014213562, -20.35, -21.414213562),
        (-27.014213562, -20.35, -21.414213562),
        (-54.414213562, -20.35, -9.414213562),
        (-54.414213562, -20.35, 9.414213562),
        (0, -24.35, 10),
        (55, -24.35, 0),
        (-41.3, -24.35, -10),
        (-27.6, -24.35, -16),
        (0, -24.35, -22),
        (27.6, -24.35, -16),
        (41.3, -24.35, -10),
        (54.414213562, -24.35, -9.414213562),
        (54.414213562, -24.35, 9.414213562),
        (27.014213562, -24.35, -21.414213562),
        (-27.014213562, -24.35, -21.414213562),
        (-54.414213562, -24.35, -9.414213562),
        (-54.414213562, -24.35, 9.414213562),
        (-28.185786438, -20.35, -10.585786438),
        (-28.185786438, -24.35, -10.585786438),
        (28.185786438, -20.35, -10.585786438),
        (28.185786438, -24.35, -10.585786438),
    ]]
    fillet(fillet8_edges, radius=FILLET8_R)


with BuildPart() as body_3:
    # Split1: the piece behind the surface
    add(part.part)
    # Split1 surface: a surface, the sketch's curves swept straight by 247.872 mm
    with BuildLine(Plane.XY.offset(10).offset(-SPLIT1_SURFACE_1_BACK), mode=Mode.PRIVATE) as split1_surface_1_path:
        Line((-27.35, 17.4), (27.35, 17.4))
        Line((27.35, 17.4), (30.6, 17.4))
        ThreePointArc((30.6, 17.4), (33.428427125, 16.228427125), (34.6, 13.4))
        Line((34.6, 13.4), (34.6, -12.75))
        ThreePointArc((34.6, -12.75), (33.428427125, -15.578427125), (30.6, -16.75))
        Line((30.6, -16.75), (-30.6, -16.75))
        ThreePointArc((-30.6, -16.75), (-33.428427125, -15.578427125), (-34.6, -12.75))
        Line((-34.6, -12.75), (-34.6, 13.4))
        ThreePointArc((-34.6, 13.4), (-33.428427125, 16.228427125), (-30.6, 17.4))
        Line((-30.6, 17.4), (-27.35, 17.4))
    split1_surface_1 = Shell.extrude(split1_surface_1_path.wire(), (0 * SPLIT1_SURFACE_1_DEPTH, 0 * SPLIT1_SURFACE_1_DEPTH, 1 * SPLIT1_SURFACE_1_DEPTH))
    split(bisect_by=split1_surface_1, keep=Keep.BOTTOM)


with BuildPart() as part_1:
    add(part.part)

    # Split1: split by a surface, the side it looks to stays
    # Split1 surface: a surface, the sketch's curves swept straight by 247.872 mm
    with BuildLine(Plane.XY.offset(10).offset(-SPLIT1_SURFACE_2_BACK), mode=Mode.PRIVATE) as split1_surface_2_path:
        Line((-27.35, 17.4), (27.35, 17.4))
        Line((27.35, 17.4), (30.6, 17.4))
        ThreePointArc((30.6, 17.4), (33.428427125, 16.228427125), (34.6, 13.4))
        Line((34.6, 13.4), (34.6, -12.75))
        ThreePointArc((34.6, -12.75), (33.428427125, -15.578427125), (30.6, -16.75))
        Line((30.6, -16.75), (-30.6, -16.75))
        ThreePointArc((-30.6, -16.75), (-33.428427125, -15.578427125), (-34.6, -12.75))
        Line((-34.6, -12.75), (-34.6, 13.4))
        ThreePointArc((-34.6, 13.4), (-33.428427125, 16.228427125), (-30.6, 17.4))
        Line((-30.6, 17.4), (-27.35, 17.4))
    split1_surface_2 = Shell.extrude(split1_surface_2_path.wire(), (0 * SPLIT1_SURFACE_2_DEPTH, 0 * SPLIT1_SURFACE_2_DEPTH, 1 * SPLIT1_SURFACE_2_DEPTH))
    split(bisect_by=split1_surface_2, keep=Keep.TOP)


solid = body_2.part
